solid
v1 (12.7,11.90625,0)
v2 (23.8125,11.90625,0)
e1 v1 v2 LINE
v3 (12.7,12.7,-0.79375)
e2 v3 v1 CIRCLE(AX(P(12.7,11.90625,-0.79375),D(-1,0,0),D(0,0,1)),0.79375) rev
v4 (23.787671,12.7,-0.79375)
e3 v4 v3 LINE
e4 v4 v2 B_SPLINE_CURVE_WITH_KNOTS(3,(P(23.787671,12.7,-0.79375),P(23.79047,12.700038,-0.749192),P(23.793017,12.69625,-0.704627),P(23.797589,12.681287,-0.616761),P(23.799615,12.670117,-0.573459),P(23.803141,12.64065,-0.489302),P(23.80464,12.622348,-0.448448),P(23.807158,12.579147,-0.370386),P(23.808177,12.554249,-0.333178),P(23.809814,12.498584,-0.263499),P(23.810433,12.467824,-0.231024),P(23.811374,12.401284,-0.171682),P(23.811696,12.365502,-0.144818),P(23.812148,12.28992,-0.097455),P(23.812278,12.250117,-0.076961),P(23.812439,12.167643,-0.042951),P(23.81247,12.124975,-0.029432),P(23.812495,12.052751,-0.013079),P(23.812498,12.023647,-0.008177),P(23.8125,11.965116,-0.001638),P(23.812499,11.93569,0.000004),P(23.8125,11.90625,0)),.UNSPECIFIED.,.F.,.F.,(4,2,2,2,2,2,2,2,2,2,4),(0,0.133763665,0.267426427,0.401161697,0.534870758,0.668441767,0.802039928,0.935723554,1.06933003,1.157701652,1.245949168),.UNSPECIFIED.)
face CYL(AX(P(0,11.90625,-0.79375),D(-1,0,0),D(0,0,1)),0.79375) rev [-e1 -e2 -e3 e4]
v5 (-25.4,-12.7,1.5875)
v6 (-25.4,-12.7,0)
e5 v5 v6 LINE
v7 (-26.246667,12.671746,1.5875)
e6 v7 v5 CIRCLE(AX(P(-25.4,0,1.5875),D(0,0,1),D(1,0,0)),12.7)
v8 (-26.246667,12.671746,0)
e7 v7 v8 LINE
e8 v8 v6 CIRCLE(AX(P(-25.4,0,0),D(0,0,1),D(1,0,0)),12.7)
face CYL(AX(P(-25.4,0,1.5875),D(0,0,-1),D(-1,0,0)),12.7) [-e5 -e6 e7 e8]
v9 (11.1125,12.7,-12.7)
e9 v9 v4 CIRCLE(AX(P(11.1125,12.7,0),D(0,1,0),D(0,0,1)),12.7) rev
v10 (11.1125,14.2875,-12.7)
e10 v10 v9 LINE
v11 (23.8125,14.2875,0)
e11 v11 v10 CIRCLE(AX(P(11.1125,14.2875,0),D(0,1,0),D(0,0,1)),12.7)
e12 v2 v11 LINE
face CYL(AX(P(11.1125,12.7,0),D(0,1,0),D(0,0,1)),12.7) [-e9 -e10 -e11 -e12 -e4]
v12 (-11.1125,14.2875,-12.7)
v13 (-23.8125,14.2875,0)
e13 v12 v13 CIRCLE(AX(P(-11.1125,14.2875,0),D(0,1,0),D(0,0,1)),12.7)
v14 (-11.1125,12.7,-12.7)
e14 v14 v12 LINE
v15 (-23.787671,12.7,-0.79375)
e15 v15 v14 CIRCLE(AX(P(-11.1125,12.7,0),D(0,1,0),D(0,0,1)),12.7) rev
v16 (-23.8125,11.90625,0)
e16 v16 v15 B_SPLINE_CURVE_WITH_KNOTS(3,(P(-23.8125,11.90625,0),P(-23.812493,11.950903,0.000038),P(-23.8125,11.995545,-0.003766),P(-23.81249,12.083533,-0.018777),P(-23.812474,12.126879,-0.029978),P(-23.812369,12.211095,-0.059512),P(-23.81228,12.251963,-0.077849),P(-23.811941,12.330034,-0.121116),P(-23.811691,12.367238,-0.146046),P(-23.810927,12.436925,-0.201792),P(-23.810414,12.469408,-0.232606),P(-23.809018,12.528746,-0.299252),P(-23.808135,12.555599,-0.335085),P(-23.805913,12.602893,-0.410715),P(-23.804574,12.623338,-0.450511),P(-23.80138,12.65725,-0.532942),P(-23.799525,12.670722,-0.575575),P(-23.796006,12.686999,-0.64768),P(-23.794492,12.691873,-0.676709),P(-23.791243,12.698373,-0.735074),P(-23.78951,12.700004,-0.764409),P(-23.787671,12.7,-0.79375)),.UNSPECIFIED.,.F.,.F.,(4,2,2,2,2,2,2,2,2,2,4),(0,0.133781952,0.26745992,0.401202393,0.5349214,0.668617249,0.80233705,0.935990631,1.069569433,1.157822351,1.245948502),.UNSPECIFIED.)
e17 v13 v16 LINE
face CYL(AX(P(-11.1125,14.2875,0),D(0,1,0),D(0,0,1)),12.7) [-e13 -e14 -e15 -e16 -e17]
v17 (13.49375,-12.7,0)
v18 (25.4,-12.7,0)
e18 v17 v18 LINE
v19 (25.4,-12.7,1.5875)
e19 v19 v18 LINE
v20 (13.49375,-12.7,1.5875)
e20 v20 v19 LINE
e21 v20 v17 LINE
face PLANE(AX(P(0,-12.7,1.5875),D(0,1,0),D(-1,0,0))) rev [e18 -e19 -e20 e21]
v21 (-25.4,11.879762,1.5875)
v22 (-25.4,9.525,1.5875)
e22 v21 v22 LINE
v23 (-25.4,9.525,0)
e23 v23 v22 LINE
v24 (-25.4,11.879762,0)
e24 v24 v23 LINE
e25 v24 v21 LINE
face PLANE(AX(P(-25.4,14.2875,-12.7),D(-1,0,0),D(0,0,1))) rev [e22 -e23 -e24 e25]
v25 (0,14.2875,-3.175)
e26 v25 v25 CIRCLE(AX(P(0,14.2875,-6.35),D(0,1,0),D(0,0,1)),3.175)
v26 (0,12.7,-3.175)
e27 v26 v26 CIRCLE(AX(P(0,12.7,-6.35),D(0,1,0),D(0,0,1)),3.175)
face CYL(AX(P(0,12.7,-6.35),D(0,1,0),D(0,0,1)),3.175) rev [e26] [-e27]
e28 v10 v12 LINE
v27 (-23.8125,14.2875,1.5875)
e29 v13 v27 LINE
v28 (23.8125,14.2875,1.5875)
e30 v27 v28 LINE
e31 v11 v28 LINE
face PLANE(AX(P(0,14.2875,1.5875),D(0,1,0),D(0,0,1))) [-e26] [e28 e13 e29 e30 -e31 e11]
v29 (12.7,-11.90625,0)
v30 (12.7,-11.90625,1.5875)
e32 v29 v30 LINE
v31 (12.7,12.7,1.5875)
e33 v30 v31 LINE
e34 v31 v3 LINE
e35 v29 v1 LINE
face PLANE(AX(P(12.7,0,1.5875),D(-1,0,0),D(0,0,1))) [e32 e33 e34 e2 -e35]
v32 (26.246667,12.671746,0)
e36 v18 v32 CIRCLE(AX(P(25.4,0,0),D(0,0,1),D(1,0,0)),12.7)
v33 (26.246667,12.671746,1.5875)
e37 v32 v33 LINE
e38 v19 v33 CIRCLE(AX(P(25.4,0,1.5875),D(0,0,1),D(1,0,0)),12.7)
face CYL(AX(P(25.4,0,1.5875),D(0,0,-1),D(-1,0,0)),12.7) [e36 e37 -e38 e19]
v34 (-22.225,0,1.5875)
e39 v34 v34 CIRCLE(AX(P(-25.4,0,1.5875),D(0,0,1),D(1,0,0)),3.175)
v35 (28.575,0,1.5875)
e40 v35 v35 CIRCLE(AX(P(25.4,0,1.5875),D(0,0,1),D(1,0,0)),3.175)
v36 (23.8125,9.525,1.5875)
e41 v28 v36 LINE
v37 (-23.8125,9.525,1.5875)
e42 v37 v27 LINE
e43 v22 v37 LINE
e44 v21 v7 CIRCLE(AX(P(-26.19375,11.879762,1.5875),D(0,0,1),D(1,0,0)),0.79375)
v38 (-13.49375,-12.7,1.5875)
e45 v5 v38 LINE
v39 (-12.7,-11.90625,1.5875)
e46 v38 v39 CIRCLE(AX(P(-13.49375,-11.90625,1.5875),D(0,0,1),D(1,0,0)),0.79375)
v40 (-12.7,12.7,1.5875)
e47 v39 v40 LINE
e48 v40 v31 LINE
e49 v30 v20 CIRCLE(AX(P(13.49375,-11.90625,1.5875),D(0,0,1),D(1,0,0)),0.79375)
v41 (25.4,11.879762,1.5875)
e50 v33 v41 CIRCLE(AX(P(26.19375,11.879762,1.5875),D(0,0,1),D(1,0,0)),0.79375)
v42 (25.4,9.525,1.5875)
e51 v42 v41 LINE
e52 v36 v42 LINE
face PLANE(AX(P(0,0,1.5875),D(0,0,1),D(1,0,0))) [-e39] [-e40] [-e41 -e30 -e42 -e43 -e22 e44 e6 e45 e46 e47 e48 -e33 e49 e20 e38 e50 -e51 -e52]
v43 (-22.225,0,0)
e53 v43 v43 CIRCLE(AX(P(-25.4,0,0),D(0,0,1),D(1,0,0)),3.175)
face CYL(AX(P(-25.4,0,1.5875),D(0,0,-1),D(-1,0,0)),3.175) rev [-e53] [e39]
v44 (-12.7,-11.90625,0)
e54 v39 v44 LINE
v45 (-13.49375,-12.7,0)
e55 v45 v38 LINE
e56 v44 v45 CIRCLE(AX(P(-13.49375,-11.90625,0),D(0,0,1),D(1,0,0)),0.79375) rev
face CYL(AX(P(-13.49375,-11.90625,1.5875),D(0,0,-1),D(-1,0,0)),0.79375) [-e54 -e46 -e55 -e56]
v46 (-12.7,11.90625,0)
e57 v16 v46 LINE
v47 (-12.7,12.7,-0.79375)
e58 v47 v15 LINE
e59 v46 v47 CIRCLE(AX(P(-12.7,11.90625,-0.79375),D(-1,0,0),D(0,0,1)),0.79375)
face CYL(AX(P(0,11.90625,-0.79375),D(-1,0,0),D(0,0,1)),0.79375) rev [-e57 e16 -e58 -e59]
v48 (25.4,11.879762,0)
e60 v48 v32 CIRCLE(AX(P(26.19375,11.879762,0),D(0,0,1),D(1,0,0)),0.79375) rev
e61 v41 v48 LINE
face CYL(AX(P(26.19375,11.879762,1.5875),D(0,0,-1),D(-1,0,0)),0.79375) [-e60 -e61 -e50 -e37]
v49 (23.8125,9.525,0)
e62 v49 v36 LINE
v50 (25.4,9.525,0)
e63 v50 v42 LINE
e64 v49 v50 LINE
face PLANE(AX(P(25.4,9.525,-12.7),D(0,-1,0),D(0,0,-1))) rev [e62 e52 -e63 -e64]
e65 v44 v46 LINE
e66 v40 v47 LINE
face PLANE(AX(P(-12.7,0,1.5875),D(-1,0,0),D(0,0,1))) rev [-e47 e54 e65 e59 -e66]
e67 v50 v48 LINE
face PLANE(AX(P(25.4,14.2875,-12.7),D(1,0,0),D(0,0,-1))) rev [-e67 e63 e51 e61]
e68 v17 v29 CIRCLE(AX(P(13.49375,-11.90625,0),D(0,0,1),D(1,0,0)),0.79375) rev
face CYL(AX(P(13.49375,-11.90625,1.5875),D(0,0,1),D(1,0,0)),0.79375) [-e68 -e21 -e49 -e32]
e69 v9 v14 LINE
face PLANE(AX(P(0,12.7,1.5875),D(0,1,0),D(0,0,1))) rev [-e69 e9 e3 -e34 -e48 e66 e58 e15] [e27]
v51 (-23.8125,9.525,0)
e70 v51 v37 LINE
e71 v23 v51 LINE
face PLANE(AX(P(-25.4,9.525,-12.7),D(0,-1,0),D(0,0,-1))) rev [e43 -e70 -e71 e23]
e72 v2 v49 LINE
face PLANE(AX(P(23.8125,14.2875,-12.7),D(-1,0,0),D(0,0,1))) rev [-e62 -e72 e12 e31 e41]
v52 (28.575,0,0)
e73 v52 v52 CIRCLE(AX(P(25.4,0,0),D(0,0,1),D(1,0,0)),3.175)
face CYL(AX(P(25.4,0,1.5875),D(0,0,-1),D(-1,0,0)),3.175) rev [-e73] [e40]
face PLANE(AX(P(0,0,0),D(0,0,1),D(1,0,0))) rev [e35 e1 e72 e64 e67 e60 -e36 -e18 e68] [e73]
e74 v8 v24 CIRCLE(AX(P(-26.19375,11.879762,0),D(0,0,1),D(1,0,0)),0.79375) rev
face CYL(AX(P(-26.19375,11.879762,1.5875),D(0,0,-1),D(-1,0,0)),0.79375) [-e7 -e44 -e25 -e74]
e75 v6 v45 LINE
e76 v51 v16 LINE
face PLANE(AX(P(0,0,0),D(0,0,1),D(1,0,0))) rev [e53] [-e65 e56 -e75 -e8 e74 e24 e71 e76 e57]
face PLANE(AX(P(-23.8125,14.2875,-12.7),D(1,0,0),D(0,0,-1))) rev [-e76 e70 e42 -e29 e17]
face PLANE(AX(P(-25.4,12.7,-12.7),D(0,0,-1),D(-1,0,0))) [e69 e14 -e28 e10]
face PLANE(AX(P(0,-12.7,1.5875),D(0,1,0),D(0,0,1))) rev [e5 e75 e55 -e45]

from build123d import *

# Parameters (mm, degrees)
SKETCH1_R               = 3.175
BOSS_EXTRUDE1_DEPTH     = 1.5875
SKETCH3_W               = 50.8
SKETCH3_H               = 12.7
SKETCH3_R               = 3.175
BOSS_EXTRUDE2_DEPTH     = 1.5875
CUT_EXTRUDE1_DEPTH      = 44.12627172
CUT_EXTRUDE1_DEPTH_BACK = 44.12627172
SKETCH5_W               = 1.5875
SKETCH5_H               = 4.7625
FILLET2_R               = 0.79375
FILLET3_R               = 12.7


with BuildPart() as part:
    # Sketch1 → Boss-Extrude1 (new body)
    with BuildSketch(Plane.XY):
        with BuildLine():
            Line((-25.4, -12.7), (-12.7, -12.7))
            Line((-12.7, -12.7), (-12.7, 12.7))
            Line((-12.7, 12.7), (12.7, 12.7))
            Line((12.7, 12.7), (12.7, -12.7))
            Line((12.7, -12.7), (25.4, -12.7))
            ThreePointArc((25.4, -12.7), (38.1, 0), (25.4, 12.7))
            Line((25.4, 12.7), (25.4, 14.2875))
            Line((25.4, 14.2875), (-25.4, 14.2875))
            Line((-25.4, 14.2875), (-25.4, 12.7))
            ThreePointArc((-25.4, 12.7), (-38.1, 0), (-25.4, -12.7))
        make_face()
        with Locations((-25.4, 0)):
            Circle(SKETCH1_R, mode=Mode.SUBTRACT)
        with Locations((25.4, 0)):
            Circle(SKETCH1_R, mode=Mode.SUBTRACT)
    extrude(amount=BOSS_EXTRUDE1_DEPTH)

    # Sketch3 → Boss-Extrude2 (add)
    with BuildSketch(Plane(origin=(0, 14.2875, 0), x_dir=(1, 0, 0), z_dir=(0, 1, 0))):
        with Locations((0, 6.35)):
            Rectangle(SKETCH3_W, SKETCH3_H)
        with Locations(Location((0, 6.35, 0), (0, 0, 270))):
            Circle(SKETCH3_R, mode=Mode.SUBTRACT)
    extrude(amount=-BOSS_EXTRUDE2_DEPTH)

    # Sketch5 → Cut-Extrude1 (cut, two sides: drawn at the far end of the back side and taken through both)
    with BuildSketch(Plane.XY.offset(1.5875).offset(-CUT_EXTRUDE1_DEPTH_BACK)):
        with Locations((-24.60625, 11.90625)):
            Rectangle(SKETCH5_W, SKETCH5_H)
        with Locations((24.60625, 11.90625)):
            Rectangle(SKETCH5_W, SKETCH5_H)
    extrude(amount=CUT_EXTRUDE1_DEPTH + CUT_EXTRUDE1_DEPTH_BACK, mode=Mode.SUBTRACT)

    # Fillet2
    fillet2_edges = [part.edges().sort_by_distance(p)[0] for p in [
        (-12.7, -12.7, 0.79375),
        (-25.4, 12.7, 0.79375),
        (25.4, 12.7, 0.79375),
        (12.7, -12.7, 0.79375),
        (18.25625, 12.7, 0),
        (-18.25625, 12.7, 0),
    ]]
    fillet(fillet2_edges, radius=FILLET2_R)

    # Fillet3
    fillet3_edges = [part.edges().sort_by_distance(p)[0] for p in [
        (23.8125, 13.49375, -12.7),
        (-23.8125, 13.49375, -12.7),
    ]]
    fillet(fillet3_edges, radius=FILLET3_R - 0.0001)  # a hair under: the kernel refuses the full size


solid = part.part
